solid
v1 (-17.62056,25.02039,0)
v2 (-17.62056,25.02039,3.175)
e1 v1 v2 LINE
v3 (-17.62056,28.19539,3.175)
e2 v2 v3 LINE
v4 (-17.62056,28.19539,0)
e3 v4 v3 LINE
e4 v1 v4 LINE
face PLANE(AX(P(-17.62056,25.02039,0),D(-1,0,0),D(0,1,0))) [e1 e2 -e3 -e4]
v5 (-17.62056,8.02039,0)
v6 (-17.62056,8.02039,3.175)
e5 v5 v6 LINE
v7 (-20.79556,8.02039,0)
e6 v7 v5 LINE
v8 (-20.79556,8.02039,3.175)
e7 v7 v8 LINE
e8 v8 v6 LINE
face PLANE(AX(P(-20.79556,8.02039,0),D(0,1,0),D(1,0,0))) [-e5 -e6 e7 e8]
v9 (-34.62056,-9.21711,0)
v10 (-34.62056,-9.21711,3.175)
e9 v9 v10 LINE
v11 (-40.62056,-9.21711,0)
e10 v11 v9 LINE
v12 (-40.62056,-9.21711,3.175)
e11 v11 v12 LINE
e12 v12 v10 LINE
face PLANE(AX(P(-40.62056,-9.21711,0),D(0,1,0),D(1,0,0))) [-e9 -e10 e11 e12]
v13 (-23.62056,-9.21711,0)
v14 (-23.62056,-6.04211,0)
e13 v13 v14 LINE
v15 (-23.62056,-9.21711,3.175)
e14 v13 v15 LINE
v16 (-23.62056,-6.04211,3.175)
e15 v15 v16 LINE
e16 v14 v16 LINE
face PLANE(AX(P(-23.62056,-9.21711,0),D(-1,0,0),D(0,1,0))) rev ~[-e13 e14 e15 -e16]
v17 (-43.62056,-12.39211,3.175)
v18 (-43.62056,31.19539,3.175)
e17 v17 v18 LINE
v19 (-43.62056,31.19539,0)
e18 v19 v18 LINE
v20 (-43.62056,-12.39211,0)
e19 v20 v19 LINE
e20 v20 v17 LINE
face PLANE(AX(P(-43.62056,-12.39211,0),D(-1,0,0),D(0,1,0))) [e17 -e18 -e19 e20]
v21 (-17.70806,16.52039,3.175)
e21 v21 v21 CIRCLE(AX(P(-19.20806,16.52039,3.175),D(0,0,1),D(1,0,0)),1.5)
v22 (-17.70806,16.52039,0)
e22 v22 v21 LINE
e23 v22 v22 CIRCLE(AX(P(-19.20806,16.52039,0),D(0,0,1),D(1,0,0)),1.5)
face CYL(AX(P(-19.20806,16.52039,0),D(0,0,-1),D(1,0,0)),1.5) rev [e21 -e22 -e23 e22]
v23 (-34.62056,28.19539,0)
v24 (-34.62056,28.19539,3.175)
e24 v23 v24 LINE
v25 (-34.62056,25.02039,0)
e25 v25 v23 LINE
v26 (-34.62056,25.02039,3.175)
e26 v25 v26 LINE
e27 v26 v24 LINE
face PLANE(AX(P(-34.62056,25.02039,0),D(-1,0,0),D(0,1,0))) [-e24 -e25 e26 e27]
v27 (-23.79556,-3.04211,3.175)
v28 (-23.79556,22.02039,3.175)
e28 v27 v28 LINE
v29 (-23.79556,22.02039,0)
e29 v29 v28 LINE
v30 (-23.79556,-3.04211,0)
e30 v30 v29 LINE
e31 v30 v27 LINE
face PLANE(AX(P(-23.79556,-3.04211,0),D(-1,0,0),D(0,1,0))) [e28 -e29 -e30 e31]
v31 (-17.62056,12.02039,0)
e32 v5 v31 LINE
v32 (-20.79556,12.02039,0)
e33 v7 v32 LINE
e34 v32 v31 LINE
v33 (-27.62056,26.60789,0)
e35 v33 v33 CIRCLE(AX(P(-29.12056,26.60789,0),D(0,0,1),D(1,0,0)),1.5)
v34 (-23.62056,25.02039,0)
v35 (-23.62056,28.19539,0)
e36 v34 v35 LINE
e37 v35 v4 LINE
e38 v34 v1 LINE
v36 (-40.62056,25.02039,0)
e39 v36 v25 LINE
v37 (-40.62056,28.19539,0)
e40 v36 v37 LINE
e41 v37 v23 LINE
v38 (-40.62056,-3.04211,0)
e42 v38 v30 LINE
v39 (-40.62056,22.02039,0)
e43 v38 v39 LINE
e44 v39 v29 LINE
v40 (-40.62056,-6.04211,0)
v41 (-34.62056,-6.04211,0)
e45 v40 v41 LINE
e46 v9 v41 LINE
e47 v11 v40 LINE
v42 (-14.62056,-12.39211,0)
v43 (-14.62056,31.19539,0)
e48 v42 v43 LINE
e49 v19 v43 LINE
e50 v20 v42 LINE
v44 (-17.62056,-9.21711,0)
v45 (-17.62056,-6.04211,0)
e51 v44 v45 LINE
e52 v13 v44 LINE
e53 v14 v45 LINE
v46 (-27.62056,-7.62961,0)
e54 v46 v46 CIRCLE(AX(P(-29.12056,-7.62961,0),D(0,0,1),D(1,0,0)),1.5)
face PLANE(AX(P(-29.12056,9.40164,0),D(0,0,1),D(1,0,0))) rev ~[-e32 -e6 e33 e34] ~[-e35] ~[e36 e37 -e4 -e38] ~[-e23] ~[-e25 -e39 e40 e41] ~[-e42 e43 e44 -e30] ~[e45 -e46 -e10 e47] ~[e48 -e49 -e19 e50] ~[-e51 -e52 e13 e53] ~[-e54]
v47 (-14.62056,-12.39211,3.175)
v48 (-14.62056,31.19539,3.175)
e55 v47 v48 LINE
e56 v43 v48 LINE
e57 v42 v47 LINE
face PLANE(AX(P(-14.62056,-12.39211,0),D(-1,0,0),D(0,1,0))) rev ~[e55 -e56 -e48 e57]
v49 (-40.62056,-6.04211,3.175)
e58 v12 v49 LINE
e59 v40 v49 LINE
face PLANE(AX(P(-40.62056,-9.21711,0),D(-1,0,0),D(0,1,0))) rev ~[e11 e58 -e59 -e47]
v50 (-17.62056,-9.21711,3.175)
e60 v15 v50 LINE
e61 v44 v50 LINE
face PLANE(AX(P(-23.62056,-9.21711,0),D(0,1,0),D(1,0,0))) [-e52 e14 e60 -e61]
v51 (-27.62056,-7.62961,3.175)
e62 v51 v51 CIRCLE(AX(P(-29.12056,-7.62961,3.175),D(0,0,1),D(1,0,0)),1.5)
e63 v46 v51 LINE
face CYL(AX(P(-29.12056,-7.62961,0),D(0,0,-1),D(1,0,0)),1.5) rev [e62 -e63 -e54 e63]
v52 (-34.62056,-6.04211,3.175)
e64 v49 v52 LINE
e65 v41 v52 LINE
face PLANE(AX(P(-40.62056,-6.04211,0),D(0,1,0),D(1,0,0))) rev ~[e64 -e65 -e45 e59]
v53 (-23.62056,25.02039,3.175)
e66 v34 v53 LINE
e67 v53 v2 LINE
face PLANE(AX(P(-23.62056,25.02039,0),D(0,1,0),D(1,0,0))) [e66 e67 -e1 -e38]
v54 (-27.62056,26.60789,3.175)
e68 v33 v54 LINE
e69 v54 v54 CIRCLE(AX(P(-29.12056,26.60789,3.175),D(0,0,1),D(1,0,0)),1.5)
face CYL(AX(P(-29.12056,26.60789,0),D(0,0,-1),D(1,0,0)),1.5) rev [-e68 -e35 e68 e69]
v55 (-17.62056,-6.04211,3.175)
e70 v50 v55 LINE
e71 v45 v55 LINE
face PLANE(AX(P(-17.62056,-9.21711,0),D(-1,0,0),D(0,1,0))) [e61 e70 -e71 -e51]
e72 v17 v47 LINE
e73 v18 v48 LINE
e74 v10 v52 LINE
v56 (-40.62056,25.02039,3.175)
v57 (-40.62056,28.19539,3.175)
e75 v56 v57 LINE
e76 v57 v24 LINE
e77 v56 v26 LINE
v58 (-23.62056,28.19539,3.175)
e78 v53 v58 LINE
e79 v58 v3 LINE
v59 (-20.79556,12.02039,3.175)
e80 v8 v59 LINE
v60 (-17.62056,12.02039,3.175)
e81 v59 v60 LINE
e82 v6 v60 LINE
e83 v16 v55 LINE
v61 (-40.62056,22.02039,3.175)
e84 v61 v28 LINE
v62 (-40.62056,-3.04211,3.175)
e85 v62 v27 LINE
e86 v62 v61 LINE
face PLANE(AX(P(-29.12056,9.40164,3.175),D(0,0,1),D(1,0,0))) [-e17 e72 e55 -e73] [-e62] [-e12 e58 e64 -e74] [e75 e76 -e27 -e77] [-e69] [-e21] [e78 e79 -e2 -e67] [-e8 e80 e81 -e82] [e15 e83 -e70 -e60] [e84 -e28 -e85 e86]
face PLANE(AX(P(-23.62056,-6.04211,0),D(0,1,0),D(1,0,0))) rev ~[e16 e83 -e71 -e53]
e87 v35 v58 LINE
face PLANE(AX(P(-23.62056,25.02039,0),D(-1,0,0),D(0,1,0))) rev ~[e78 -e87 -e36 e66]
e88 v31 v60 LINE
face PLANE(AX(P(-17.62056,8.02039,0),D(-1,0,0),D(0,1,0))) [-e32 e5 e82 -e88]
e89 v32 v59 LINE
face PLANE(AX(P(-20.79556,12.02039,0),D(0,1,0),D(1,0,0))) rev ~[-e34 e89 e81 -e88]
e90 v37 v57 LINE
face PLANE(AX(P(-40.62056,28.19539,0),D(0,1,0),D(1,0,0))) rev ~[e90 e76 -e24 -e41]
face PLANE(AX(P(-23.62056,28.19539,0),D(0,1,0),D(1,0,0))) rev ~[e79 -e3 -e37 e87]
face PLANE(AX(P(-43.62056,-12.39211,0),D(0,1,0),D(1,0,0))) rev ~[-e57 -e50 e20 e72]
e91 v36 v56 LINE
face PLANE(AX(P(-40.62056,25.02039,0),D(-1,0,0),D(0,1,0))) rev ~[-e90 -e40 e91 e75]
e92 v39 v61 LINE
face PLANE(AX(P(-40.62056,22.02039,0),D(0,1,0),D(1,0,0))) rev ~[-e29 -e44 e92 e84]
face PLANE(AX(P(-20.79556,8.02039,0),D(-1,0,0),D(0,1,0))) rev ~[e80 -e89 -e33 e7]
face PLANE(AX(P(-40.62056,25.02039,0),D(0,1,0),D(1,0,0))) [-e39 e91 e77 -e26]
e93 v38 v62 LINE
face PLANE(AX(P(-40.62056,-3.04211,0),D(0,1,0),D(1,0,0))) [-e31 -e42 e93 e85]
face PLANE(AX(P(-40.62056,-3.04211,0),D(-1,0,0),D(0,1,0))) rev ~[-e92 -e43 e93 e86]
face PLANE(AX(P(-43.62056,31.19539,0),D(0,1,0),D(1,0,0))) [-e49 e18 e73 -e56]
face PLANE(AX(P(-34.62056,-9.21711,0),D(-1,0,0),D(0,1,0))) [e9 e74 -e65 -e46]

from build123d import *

# Parameters (mm, degrees)
F0_W     = 29
F0_H     = 43.5875
F0_W_2   = 6
F0_H_2   = 3.175
F0_R     = 1.5
F0_W_3   = 16.825
F0_H_3   = 25.0625
F0_W_4   = 3.175
F0_H_4   = 4
F1_DEPTH = 3.175


# Not quite as in the source:
# - a length typed as a fraction of an inch, garbled in the dataset ("3 / 203.2 mm" for 3/8 in), is restored


with BuildPart() as f1:
    # F0 (on Top) → F1 (new body)
    with BuildSketch(Plane.XY):
        with Locations((-29.1205597607, 9.4016398251)):
            Rectangle(F0_W, F0_H)
        with Locations((-37.6205597607, -7.6296101749)):
            Rectangle(F0_W_2, F0_H_2, mode=Mode.SUBTRACT)
        with Locations((-29.1205597607, -7.6296101749)):
            Circle(F0_R, mode=Mode.SUBTRACT)
        with Locations((-20.6205597607, -7.6296101749)):
            Rectangle(F0_W_2, F0_H_2, mode=Mode.SUBTRACT)
        with Locations((-32.2080597607, 9.4891398251)):
            Rectangle(F0_W_3, F0_H_3, mode=Mode.SUBTRACT)
        with Locations((-37.6205597607, 26.6078898251)):
            Rectangle(F0_W_2, F0_H_2, mode=Mode.SUBTRACT)
        with Locations((-19.2080597607, 10.0203898251)):
            Rectangle(F0_W_4, F0_H_4, mode=Mode.SUBTRACT)
        with Locations((-19.2080597607, 16.5203898251)):
            Circle(F0_R, mode=Mode.SUBTRACT)
        with Locations((-29.1205597607, 26.6078898251)):
            Circle(F0_R, mode=Mode.SUBTRACT)
        with Locations((-20.6205597607, 26.6078898251)):
            Rectangle(F0_W_2, F0_H_2, mode=Mode.SUBTRACT)
    extrude(amount=F1_DEPTH)


solid = f1.part
